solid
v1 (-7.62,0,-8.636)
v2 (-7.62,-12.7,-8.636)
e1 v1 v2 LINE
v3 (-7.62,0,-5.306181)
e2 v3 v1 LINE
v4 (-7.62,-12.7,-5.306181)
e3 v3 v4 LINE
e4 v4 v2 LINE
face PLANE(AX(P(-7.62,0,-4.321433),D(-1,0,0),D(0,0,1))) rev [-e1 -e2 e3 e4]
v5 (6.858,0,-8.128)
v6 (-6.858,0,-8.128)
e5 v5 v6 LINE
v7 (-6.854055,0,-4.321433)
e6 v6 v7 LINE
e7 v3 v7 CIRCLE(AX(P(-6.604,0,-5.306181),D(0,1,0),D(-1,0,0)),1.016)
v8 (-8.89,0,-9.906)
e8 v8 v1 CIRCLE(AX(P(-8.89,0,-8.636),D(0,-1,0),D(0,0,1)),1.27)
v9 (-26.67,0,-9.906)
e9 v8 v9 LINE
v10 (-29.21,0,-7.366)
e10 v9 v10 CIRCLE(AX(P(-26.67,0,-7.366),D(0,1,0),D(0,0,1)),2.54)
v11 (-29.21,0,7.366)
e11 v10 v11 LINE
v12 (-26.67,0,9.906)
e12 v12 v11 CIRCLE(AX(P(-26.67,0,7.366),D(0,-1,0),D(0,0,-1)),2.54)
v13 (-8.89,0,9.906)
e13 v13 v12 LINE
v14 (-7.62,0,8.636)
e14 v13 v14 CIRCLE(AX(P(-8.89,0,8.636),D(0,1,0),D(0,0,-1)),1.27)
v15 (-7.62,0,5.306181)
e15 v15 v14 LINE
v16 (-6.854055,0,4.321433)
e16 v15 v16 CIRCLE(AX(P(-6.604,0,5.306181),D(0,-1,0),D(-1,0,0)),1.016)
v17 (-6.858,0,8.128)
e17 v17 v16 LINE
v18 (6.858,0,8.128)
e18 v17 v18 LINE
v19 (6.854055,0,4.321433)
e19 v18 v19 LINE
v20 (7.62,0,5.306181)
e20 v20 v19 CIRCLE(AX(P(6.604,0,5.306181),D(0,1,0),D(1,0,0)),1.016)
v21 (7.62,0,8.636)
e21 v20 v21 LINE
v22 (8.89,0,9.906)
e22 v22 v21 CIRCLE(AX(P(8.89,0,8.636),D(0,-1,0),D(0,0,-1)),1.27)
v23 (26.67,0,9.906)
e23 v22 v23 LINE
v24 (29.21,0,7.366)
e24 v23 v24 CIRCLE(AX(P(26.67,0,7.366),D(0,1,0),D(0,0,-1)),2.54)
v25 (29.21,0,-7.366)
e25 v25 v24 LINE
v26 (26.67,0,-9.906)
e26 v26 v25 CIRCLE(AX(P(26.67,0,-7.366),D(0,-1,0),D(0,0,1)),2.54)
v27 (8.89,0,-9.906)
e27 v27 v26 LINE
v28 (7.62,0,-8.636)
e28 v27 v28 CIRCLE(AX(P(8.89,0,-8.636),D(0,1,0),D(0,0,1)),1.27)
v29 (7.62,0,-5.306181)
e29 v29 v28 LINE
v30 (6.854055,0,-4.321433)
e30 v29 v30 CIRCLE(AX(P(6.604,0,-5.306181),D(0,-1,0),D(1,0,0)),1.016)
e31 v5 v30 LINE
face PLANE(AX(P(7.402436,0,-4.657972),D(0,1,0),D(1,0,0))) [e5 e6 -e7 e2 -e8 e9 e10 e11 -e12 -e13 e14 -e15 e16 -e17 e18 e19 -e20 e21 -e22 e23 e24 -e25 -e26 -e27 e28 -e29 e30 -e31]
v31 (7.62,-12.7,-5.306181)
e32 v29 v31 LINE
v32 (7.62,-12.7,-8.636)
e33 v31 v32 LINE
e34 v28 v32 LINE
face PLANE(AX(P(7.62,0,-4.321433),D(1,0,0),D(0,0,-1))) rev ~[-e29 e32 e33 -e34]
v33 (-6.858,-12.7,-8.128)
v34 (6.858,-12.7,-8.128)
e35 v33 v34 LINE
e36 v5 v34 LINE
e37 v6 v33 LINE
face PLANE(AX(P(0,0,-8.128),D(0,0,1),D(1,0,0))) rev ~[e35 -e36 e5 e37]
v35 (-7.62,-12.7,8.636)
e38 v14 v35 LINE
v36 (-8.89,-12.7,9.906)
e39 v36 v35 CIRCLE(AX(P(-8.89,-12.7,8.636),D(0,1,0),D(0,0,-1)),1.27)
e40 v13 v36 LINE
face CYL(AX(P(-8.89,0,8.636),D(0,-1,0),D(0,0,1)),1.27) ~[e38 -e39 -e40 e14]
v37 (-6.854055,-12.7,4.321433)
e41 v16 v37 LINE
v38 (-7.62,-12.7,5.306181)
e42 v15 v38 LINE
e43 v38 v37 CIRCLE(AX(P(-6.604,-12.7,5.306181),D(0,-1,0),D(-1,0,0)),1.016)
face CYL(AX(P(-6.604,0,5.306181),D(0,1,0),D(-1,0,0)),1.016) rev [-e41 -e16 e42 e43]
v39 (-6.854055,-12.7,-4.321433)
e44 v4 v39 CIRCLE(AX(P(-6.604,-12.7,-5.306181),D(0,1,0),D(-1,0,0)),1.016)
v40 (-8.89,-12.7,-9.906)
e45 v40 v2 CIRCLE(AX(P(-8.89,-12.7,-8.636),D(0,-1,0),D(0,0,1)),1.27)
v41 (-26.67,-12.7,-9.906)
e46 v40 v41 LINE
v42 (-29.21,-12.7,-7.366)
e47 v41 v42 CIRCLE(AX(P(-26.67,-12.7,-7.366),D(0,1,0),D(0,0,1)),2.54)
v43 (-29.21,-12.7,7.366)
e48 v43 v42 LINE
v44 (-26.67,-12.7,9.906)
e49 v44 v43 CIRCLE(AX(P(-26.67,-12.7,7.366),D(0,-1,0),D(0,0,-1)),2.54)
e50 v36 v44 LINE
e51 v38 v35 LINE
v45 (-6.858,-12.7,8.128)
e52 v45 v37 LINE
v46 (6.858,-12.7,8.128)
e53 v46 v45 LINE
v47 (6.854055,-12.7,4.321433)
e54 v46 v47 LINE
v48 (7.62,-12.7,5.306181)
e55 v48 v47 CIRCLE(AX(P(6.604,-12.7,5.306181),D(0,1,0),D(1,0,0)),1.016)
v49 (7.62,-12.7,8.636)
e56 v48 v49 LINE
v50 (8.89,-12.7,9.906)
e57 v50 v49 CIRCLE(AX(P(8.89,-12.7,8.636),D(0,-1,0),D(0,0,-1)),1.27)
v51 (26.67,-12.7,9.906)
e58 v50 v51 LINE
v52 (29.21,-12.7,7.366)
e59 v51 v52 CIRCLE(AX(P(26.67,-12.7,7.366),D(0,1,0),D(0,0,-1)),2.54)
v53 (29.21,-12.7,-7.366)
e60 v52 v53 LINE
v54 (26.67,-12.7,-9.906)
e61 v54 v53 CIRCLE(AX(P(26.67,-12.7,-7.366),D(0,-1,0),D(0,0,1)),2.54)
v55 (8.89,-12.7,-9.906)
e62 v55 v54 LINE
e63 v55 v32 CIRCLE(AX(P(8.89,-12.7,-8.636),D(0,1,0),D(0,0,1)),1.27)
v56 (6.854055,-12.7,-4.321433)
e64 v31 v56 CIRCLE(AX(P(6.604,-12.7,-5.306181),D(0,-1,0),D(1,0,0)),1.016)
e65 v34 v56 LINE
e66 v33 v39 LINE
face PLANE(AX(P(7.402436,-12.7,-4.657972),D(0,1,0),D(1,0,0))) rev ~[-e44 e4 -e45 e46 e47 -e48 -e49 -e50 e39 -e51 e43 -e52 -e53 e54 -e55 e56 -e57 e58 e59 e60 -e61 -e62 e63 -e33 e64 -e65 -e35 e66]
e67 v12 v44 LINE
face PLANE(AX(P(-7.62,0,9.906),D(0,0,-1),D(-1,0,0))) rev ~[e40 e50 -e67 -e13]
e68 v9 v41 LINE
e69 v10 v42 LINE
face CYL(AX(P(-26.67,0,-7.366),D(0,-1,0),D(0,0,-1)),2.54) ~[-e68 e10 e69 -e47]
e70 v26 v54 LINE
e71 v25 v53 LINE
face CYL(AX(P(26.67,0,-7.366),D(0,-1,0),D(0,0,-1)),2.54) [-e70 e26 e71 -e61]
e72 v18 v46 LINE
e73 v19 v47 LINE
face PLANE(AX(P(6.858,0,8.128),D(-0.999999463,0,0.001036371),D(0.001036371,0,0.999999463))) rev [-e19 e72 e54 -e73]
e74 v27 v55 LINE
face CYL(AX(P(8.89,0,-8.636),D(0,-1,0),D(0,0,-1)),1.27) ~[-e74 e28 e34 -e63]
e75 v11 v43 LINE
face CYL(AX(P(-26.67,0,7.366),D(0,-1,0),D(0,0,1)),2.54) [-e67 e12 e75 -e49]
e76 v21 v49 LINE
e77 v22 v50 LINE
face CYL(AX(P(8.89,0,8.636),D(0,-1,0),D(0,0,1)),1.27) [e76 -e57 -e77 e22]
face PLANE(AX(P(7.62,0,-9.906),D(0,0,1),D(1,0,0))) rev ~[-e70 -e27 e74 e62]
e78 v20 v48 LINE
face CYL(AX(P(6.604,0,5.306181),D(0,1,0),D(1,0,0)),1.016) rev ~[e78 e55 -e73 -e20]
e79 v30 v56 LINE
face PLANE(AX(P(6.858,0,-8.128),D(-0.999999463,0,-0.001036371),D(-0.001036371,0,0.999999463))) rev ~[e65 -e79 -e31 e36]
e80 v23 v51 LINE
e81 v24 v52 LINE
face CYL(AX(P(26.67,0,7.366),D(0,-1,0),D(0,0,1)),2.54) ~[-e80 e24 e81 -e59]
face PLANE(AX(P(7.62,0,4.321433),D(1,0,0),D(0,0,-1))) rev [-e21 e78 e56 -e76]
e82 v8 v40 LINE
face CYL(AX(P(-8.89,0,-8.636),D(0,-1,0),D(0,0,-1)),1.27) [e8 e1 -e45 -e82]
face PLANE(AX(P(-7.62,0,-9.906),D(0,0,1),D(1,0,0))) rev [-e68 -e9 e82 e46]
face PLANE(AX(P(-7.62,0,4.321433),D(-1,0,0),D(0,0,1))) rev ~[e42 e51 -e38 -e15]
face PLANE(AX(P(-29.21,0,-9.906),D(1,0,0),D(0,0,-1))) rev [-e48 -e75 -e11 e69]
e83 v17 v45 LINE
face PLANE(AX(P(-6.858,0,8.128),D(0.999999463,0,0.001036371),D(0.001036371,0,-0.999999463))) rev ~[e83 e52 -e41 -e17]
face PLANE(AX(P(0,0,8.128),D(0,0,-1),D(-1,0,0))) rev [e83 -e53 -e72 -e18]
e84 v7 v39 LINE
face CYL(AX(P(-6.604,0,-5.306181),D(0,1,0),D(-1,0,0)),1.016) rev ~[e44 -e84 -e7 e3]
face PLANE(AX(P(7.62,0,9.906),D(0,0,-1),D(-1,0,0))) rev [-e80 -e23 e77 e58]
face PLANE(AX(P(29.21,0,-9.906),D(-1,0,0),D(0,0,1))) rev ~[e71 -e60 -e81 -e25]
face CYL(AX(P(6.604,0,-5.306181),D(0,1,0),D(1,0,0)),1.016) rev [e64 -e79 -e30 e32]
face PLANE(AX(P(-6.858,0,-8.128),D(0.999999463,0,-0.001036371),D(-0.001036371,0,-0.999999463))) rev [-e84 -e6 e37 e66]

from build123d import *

# Parameters (mm, degrees)
F1_DEPTH    = 12.7
F2_R        = 2.54
F3_R        = 1.27
F4_T1_DEPTH = 12.7


# Not quite as in the source:
# - a fillet or chamfer that OpenCascade refuses, or shapes differently, is made with other operations: its cross-section is extruded or revolved along the edge and cut away or added


with BuildPart() as f1:
    # F0 (on Front) → F1 (new body)
    with BuildSketch(Plane.XZ):
        Polygon((-29.21, 0), (0, 0), (0, 8.128), (-6.858, 8.128), (-6.8540549837, 4.3214331381), (-7.62, 4.3214331381), (-7.62, 9.906), (-29.21, 9.906), align=None)
    extrude(amount=F1_DEPTH)

    # F2
    f2_edges = [f1.edges().sort_by_distance(p)[0] for p in [
        (-29.21, -6.35, 9.906),
    ]]
    fillet(f2_edges, radius=F2_R)

    # F3
    f3_edges = [f1.edges().sort_by_distance(p)[0] for p in [
        (-7.62, -6.35, 9.906),
    ]]
    fillet(f3_edges, radius=F3_R)

    # F4: fillet of radius 1.016 on 1 edges, made by hand

    # F4_s2 → F4_t1 (join)
    with BuildSketch(Plane.XZ):
        with BuildLine():
            ThreePointArc((-7.62, 5.306181078), (-7.4059700317, 4.6824022163), (-6.8540549837, 4.3214331381))
            Line((-6.8540549837, 4.3214331381), (-7.62, 4.3214331381))
            Line((-7.62, 4.3214331381), (-7.62, 5.306181078))
        make_face()
    extrude(amount=F4_T1_DEPTH)

    # F5: F1 across face


with BuildPart() as f1_1:
    add(f1.part)
    add(f1.part.mirror(Plane(origin=(-14.605, -6.35, 0), x_dir=(1, 0, 0), z_dir=(0, 0, -1))))

    # F6: F1 across face


with BuildPart() as f1_2:
    add(f1_1.part)
    add(f1_1.part.mirror(Plane(origin=(0, -6.35, 0), x_dir=(0, 1, 0), z_dir=(1, 0, 0))))


solid = f1_2.part
